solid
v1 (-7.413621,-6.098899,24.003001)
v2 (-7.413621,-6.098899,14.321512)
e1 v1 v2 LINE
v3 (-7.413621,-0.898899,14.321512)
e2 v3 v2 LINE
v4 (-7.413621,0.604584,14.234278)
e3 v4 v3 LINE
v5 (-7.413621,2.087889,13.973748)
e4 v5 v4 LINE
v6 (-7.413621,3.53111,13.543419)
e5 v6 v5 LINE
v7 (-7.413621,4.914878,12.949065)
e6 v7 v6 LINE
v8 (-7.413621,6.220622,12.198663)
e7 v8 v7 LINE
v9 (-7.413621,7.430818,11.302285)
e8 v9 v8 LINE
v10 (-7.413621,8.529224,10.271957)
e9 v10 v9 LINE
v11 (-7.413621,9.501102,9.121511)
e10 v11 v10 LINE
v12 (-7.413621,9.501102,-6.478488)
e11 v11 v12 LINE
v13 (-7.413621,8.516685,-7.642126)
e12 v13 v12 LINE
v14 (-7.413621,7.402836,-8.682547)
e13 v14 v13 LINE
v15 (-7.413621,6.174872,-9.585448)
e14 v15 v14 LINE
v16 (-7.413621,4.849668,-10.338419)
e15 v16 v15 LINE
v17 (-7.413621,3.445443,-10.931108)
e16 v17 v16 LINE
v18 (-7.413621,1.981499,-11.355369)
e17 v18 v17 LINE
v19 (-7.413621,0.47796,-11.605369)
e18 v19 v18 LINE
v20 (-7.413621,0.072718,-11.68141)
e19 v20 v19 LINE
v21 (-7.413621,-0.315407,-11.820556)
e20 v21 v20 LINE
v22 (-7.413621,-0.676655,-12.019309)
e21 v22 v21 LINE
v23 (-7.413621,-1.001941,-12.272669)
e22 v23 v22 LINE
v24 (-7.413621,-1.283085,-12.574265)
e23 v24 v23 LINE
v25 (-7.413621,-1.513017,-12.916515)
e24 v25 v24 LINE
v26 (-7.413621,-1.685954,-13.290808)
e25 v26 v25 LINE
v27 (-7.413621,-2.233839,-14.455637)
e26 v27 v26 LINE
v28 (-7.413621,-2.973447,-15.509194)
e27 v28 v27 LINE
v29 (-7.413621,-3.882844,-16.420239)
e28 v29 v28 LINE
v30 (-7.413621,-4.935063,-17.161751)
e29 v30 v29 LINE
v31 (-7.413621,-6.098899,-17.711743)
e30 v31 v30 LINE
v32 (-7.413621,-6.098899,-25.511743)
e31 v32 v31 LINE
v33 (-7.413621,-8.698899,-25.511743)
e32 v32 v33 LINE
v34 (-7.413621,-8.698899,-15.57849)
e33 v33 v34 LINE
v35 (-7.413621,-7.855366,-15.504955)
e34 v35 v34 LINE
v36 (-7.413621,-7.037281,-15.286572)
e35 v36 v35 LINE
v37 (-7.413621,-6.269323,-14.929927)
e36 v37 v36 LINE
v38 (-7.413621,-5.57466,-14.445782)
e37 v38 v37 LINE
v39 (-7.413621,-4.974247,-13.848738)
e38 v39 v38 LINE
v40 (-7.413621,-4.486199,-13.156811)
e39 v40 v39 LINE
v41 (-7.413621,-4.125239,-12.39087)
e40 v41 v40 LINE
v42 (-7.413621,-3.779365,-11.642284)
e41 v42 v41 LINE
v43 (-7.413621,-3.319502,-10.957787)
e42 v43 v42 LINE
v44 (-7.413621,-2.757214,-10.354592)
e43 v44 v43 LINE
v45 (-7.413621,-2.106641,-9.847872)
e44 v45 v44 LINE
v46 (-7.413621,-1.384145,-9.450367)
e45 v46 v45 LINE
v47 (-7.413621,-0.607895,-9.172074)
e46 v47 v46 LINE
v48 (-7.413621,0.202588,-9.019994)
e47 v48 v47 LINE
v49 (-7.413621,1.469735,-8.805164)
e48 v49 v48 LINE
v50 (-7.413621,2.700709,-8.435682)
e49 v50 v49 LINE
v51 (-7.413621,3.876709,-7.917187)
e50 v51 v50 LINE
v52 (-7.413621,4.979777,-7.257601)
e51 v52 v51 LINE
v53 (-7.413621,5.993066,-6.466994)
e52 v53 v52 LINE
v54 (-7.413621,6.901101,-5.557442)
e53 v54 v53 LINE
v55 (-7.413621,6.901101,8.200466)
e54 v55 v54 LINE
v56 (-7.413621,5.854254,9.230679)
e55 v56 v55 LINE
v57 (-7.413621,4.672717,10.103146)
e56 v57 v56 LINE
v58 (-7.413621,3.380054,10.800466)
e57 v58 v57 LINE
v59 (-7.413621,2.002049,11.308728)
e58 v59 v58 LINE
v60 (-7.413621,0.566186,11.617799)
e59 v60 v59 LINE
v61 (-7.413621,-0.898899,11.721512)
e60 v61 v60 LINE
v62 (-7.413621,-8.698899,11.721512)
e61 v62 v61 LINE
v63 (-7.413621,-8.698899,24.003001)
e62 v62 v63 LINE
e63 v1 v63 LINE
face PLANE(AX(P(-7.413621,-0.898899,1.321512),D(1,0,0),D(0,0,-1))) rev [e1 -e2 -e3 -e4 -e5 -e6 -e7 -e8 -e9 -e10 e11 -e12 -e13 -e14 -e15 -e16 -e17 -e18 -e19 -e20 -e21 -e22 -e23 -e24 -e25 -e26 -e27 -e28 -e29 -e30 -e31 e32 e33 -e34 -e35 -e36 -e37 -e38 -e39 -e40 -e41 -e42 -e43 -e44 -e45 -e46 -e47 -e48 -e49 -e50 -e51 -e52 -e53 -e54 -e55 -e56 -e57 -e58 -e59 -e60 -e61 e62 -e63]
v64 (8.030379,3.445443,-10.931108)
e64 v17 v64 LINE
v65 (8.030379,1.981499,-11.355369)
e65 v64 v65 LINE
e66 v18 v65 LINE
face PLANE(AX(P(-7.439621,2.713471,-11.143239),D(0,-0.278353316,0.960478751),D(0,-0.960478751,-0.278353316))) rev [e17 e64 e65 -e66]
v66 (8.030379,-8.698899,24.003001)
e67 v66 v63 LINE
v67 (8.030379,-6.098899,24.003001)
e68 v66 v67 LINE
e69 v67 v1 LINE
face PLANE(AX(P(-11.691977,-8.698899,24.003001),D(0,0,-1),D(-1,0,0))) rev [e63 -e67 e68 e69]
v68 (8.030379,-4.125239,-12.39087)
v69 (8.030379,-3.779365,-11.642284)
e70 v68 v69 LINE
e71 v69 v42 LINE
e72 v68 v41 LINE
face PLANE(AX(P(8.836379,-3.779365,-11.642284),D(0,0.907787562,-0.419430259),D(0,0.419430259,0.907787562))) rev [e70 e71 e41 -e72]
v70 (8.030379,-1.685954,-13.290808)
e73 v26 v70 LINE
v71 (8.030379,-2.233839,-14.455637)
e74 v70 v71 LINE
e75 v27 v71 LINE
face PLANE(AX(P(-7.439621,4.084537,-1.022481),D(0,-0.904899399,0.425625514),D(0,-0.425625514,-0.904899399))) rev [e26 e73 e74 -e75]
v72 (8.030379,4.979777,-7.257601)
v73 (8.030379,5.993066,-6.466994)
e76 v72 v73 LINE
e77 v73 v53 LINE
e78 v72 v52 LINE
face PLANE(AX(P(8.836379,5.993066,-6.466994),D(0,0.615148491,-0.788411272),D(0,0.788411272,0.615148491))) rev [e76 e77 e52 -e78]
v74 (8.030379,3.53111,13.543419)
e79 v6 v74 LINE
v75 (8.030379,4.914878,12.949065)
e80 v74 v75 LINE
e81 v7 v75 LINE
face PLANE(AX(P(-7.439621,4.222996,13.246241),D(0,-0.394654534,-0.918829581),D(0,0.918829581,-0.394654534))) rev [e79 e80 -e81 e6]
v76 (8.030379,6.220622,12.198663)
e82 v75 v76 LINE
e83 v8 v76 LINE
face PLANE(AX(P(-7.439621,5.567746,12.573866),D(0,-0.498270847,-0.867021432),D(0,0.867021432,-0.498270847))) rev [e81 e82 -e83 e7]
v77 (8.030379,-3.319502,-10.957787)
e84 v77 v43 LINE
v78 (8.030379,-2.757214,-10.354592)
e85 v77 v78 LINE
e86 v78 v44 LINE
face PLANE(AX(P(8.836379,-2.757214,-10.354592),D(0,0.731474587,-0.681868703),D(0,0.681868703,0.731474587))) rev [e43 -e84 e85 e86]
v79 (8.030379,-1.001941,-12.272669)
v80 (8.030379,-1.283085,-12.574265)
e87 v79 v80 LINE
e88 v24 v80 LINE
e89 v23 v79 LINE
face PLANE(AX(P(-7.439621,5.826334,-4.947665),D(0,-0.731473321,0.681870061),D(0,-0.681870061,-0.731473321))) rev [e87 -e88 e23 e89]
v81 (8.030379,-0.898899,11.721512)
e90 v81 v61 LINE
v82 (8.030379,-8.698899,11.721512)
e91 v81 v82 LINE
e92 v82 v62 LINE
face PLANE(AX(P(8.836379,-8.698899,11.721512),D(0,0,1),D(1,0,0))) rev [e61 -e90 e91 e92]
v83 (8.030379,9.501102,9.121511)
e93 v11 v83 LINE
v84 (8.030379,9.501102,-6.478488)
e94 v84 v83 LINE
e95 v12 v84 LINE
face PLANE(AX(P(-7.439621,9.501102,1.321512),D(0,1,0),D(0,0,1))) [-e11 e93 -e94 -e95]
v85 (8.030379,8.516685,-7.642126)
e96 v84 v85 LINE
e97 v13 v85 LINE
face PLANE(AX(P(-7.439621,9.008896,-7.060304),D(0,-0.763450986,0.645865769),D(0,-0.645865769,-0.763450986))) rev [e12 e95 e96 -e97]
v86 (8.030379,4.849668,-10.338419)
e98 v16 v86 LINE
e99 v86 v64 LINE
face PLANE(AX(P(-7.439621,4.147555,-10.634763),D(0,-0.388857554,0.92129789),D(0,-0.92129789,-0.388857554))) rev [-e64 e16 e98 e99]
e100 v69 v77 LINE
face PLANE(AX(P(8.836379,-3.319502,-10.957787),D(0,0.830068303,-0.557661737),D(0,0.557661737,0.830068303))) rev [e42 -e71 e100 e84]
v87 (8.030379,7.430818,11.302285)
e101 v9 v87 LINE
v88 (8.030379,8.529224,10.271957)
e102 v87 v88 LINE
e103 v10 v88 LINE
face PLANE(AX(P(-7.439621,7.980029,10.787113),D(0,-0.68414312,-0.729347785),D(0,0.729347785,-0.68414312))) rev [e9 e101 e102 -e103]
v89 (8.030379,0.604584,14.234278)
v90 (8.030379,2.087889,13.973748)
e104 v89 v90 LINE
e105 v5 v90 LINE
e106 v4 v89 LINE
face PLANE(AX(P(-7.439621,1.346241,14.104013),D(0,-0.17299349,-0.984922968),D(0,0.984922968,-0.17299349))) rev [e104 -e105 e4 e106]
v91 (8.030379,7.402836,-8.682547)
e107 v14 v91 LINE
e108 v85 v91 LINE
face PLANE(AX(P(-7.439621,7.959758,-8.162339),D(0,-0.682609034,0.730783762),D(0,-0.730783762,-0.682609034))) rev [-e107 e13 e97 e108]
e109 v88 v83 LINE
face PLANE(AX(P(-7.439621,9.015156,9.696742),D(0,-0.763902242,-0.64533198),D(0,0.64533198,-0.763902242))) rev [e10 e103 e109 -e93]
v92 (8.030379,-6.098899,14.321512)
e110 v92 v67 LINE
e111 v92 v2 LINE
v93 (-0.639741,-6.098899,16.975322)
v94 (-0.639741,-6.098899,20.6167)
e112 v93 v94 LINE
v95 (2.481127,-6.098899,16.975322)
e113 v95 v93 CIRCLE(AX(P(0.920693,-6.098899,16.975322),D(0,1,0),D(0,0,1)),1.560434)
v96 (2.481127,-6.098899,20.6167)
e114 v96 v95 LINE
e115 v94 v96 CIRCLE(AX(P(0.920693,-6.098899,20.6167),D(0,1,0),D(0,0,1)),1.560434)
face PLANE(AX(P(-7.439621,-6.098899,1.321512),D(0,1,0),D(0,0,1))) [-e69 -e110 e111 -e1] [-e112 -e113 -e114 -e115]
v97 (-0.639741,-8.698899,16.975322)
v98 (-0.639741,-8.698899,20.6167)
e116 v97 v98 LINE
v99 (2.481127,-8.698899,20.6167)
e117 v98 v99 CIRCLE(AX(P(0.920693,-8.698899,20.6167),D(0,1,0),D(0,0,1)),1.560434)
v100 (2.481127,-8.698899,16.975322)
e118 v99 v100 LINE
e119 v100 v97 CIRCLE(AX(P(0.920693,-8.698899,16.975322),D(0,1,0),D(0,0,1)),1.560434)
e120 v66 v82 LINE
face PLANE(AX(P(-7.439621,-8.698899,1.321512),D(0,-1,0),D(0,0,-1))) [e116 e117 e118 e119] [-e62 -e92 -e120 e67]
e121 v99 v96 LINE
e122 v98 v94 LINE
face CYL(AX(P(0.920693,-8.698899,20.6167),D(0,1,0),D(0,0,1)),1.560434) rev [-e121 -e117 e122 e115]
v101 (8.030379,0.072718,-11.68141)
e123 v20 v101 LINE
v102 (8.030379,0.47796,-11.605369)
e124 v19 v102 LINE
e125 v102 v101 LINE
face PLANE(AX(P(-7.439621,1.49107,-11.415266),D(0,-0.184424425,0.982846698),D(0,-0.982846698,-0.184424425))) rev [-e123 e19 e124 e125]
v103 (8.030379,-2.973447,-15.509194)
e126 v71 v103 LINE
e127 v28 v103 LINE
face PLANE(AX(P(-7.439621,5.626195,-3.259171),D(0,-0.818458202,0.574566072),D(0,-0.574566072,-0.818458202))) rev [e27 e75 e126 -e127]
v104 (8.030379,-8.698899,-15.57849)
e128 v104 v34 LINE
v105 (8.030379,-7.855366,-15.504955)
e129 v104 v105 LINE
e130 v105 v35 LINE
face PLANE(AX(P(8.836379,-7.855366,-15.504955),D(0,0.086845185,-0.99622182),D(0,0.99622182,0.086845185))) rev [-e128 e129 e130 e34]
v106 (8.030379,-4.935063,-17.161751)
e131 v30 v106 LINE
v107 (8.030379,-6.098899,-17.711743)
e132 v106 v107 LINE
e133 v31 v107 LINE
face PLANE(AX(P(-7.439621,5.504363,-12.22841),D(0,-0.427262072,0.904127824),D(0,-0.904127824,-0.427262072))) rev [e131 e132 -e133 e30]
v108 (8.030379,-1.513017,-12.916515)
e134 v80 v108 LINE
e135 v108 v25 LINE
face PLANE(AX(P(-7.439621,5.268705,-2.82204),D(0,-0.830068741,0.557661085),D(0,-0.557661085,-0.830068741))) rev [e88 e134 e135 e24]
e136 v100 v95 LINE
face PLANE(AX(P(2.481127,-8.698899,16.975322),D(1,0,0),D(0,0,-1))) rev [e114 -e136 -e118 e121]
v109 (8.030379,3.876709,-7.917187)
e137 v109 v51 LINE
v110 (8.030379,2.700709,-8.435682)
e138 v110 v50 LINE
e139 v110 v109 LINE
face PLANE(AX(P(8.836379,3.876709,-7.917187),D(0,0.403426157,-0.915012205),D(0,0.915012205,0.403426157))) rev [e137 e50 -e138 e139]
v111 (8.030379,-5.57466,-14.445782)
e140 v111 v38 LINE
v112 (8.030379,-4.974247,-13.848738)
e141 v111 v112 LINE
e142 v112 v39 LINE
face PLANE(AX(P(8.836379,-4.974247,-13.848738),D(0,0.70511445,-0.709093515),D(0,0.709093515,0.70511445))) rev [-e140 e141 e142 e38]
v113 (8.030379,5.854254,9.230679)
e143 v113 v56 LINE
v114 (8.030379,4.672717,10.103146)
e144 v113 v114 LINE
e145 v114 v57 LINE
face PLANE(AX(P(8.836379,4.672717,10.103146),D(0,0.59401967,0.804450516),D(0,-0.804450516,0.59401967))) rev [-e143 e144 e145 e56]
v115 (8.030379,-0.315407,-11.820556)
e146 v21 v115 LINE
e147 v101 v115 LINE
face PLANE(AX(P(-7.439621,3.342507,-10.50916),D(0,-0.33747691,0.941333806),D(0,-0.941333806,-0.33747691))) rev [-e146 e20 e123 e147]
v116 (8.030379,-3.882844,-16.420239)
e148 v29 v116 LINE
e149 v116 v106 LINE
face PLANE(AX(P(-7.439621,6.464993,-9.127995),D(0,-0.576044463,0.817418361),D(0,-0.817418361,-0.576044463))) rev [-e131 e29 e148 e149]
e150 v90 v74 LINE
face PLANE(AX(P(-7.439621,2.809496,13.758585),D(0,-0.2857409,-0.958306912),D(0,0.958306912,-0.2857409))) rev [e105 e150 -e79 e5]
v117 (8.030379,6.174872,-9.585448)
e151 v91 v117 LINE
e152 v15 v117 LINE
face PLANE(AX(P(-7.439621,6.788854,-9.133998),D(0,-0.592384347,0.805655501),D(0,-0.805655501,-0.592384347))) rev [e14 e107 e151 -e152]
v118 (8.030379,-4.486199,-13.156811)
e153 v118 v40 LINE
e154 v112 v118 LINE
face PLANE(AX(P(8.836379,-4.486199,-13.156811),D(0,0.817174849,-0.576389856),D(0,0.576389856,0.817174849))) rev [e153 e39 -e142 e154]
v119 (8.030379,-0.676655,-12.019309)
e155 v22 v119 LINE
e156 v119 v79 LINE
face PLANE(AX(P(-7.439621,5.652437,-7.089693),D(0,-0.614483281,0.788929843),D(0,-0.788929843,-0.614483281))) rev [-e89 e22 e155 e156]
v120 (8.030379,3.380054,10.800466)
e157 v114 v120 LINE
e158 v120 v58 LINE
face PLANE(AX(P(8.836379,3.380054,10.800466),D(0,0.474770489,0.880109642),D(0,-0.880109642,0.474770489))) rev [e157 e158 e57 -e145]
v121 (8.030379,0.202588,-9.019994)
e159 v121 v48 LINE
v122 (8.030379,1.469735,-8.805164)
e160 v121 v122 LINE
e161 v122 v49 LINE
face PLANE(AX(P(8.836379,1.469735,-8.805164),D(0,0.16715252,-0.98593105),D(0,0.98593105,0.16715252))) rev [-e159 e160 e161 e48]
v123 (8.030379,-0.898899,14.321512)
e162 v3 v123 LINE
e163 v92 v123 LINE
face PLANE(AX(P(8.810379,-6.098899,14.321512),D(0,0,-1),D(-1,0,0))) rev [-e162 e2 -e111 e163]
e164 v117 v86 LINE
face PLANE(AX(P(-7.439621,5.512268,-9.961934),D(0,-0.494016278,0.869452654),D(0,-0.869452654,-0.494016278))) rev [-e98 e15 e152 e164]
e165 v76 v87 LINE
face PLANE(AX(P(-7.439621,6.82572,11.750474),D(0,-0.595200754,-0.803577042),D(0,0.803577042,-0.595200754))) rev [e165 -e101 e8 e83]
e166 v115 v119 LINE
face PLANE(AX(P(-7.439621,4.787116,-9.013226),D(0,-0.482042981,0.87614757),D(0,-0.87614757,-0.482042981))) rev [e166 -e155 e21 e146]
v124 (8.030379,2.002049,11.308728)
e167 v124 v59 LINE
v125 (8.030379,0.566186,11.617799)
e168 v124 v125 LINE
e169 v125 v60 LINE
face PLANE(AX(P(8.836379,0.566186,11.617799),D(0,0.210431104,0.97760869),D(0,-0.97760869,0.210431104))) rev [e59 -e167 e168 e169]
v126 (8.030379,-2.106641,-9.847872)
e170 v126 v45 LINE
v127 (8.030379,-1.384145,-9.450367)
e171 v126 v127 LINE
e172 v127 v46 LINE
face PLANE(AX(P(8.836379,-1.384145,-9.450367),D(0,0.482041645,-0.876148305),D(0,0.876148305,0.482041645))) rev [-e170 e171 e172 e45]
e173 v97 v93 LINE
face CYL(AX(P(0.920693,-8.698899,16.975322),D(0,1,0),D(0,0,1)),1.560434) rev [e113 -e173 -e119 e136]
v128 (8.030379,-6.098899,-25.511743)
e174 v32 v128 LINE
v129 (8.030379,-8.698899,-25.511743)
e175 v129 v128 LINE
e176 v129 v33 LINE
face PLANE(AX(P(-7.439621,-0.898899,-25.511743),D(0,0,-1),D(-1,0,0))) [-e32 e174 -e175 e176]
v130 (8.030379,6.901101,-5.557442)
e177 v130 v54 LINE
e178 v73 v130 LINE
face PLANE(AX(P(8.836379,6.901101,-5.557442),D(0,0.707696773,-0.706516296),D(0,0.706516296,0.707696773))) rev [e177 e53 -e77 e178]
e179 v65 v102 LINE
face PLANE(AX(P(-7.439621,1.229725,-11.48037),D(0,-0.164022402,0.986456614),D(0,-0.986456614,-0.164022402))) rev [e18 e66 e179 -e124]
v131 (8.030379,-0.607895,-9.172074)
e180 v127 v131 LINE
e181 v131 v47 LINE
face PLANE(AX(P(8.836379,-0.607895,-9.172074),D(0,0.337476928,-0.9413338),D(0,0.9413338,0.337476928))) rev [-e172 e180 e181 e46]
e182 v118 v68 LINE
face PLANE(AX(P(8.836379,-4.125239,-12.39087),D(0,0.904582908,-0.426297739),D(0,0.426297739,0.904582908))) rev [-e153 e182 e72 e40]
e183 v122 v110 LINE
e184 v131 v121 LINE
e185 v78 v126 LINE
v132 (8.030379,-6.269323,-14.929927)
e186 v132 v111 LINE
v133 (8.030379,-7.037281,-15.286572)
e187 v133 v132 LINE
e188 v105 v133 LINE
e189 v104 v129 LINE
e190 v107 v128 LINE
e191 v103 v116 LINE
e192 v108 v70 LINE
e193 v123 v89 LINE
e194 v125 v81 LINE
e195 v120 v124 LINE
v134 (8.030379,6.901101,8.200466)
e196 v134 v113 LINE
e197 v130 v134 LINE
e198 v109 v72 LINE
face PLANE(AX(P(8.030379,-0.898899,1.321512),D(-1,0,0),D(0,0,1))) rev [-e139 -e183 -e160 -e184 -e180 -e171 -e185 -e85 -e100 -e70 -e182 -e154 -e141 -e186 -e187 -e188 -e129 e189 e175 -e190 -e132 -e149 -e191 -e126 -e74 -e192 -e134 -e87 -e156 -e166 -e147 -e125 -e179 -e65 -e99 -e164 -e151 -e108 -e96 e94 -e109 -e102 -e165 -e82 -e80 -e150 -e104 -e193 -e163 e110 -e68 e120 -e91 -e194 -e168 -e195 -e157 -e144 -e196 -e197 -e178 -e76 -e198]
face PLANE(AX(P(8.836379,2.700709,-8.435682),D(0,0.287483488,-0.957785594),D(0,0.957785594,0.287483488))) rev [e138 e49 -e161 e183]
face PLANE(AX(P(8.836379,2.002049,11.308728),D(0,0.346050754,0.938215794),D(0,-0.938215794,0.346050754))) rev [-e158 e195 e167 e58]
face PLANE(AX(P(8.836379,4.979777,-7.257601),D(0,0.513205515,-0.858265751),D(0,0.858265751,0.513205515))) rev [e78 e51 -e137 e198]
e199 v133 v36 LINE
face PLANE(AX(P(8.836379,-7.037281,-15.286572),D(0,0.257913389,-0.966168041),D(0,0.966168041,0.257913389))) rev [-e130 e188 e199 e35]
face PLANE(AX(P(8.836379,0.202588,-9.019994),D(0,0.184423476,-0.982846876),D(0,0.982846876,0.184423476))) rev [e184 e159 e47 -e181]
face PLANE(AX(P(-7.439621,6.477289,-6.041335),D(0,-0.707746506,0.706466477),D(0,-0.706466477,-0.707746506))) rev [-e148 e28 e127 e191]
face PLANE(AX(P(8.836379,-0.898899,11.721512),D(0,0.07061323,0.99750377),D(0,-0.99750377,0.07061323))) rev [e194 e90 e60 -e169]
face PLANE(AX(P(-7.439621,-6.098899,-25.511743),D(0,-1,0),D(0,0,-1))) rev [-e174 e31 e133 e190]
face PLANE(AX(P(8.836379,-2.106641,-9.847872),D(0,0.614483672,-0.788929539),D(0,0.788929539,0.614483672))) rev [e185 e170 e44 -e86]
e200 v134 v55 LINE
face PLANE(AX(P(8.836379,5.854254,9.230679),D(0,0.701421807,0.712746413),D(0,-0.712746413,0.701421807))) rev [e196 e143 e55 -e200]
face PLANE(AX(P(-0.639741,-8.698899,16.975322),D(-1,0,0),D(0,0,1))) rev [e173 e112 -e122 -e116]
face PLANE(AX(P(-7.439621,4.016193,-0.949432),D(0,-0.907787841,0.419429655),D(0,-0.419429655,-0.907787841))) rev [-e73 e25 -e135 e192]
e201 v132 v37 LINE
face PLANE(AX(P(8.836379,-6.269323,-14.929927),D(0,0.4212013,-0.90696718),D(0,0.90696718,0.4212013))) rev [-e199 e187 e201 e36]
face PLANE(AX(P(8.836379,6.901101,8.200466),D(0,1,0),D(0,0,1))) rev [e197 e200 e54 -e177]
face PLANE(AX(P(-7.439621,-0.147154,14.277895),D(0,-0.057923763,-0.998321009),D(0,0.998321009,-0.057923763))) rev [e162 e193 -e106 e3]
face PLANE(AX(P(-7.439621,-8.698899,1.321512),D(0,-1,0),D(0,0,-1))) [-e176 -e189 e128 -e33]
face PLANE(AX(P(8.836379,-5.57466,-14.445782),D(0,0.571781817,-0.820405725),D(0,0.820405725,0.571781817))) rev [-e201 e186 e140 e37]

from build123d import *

# Parameters (mm, degrees)
CUT_EXTRUDE1_START   = -0.299999985
CUT_EXTRUDE1_DEPTH   = 0.099999976
CUT_EXTRUDE1_2_DEPTH = 0.624999986
CUT_EXTRUDE2_REACH   = 3.369
CUT_EXTRUDE3_DEPTH   = 0.099999976
CUT_EXTRUDE4_DEPTH   = 2.439835087
SKETCH8_W            = 0.45707022
SKETCH8_H            = 0.126497466
CUT_EXTRUDE5_DEPTH   = 2.36862159
BOSS_EXTRUDE1_DEPTH  = 0.3
SKETCH10_W           = 0.320867719
SKETCH10_H           = 0.471779159
BOSS_EXTRUDE2_DEPTH  = 0.1
CUT_EXTRUDE6_DEPTH   = 2.347497156
SKETCH12_W           = 0.905202631
SKETCH12_H           = 0.17588134
CUT_EXTRUDE7_DEPTH   = 2.347497156
SKETCH13_W           = 2.413938714
SKETCH13_H           = 1.247285026
CUT_EXTRUDE8_DEPTH   = 0.03
SKETCH14_W           = 2.254507246
SKETCH14_H           = 1.130570224
CUT_EXTRUDE9_DEPTH   = 0.001
SCALE1_SCALE         = 26


with BuildPart() as part:
    # Cut-Extrude1: read off the stored shape, not the designer's step
    # Cut-Extrude1 outline → Cut-Extrude1 (new body)
    with BuildSketch(Plane(origin=(0, 0, 0), x_dir=(-1, 0, 0), z_dir=(0, 1, 0)).offset(CUT_EXTRUDE1_START)):
        Polygon((-0.103293976, 1.023100922), (-0.125000006, 1.025000005), (-0.500000024, 1.025000005), (-0.52170601, 1.023100922), (-0.542752503, 1.017461531), (-0.562499976, 1.008253195), (-0.580348424, 0.995755661), (-0.595755526, 0.980348443), (-0.608253176, 0.962500053), (-0.61746157, 0.942752522), (-0.623101019, 0.921706087), (-0.624999986, 0.899999985), (-0.624999986, -1.025000005), (-0.623101019, -1.046706107), (-0.61746157, -1.067752484), (-0.608253176, -1.087500015), (-0.595755526, -1.105348463), (-0.580348424, -1.120755565), (-0.562499976, -1.133253216), (-0.542752503, -1.142461551), (-0.52170601, -1.148100942), (-0.500000024, -1.150000026), (-0.125000006, -1.150000026), (-0.103293976, -1.148100942), (-0.082247483, -1.142461551), (-0.062500003, -1.133253216), (-0.044651548, -1.120755565), (-0.029244446, -1.105348463), (-0.016746824, -1.087500015), (-0.007538422, -1.067752484), (-0.001899031, -1.046706107), (0, -1.025000005), (0, 0.899999985), (-0.001899031, 0.921706087), (-0.007538422, 0.942752522), (-0.016746824, 0.962500053), (-0.029244446, 0.980348443), (-0.044651548, 0.995755661), (-0.062500003, 1.008253195), (-0.082247483, 1.017461531), align=None)
    extrude(amount=CUT_EXTRUDE1_DEPTH)

    # Cut-Extrude1 2 outline → Cut-Extrude1 2 (add)
    with BuildSketch(Plane.YZ):
        Polygon((0.057826259, 0.496644876), (0, 0.500000024), (-0.200000009, 0.500000024), (-0.200000009, -0.73204824), (-0.155237081, -0.710894703), (-0.114767128, -0.682375045), (-0.079790305, -0.647334848), (-0.051343839, -0.60681341), (-0.030271342, -0.562012312), (-0.023619925, -0.547616393), (-0.014776401, -0.534452964), (-0.003963165, -0.522853108), (0.008547848, -0.513108505), (0.022442007, -0.505464152), (0.037369897, -0.500112365), (0.0529561, -0.497187721), (0.110784524, -0.487572339), (0.167090067, -0.471254607), (0.22109873, -0.448458857), (0.272068108, -0.41949845), (0.319297513, -0.384771498), (0.362137827, -0.344755303), (0.400000019, -0.299999985), (0.400000019, 0.299999985), (0.362620107, 0.344247906), (0.320373714, 0.383875886), (0.273827725, 0.418351992), (0.223606796, 0.447213592), (0.170384956, 0.47007337), (0.114876457, 0.486624485), align=None)
    extrude(amount=CUT_EXTRUDE1_2_DEPTH)

    # Sketch2 → Cut-Extrude2 (cut, up to next)
    with BuildSketch(Plane.ZY, mode=Mode.PRIVATE) as cut_extrude2_sk1:
        Polygon((-0.65000006, -0.299999985), (0.400000019, -0.299999985), (0.400000019, 0), (0.396011048, 0.056349407), (0.384123705, 0.11157494), (0.364575157, 0.164575133), (0.337755162, 0.214292915), (0.304198737, 0.259736669), (0.264575152, 0.299999985), (-0.264575152, 0.299999985), (-0.299557927, 0.265075563), (-0.329965871, 0.226102915), (-0.355334574, 0.183677243), (-0.375276693, 0.138446456), (-0.389487541, 0.091101319), (-0.397750206, 0.042364885), (-0.403599464, 0.011192467), (-0.414303038, -0.01866331), (-0.429591688, -0.046451623), (-0.449080922, -0.07147366), (-0.472280721, -0.093100134), (-0.498607522, -0.110787172), (-0.527399301, -0.124090002), (-0.556858547, -0.137973097), (-0.583471148, -0.15674415), (-0.606434362, -0.179836949), (-0.625055342, -0.20655476), (-0.638772442, -0.236091611), (-0.647171808, -0.267556432), align=None)
    cut_extrude2_tool1 = extrude(cut_extrude2_sk1.sketch, amount=-CUT_EXTRUDE2_REACH, mode=Mode.PRIVATE) & part.part
    add(cut_extrude2_tool1.solids().sort_by_distance((0, -0.029264, -0.044377))[0], mode=Mode.SUBTRACT)

    # Sketch3 → Cut-Extrude3 (cut)
    with BuildSketch(Plane(origin=(0, -0.200000009, 0), x_dir=(-1, 0, 0), z_dir=(0, 1, 0))):
        Polygon((-0.231526632, 0.946749991), (-0.240874855, 0.960100675), (-0.252399361, 0.971625152), (-0.265749986, 0.98097336), (-0.280521112, 0.987861305), (-0.296263897, 0.992079498), (-0.312499993, 0.993499998), (-0.328736118, 0.992079498), (-0.344478874, 0.987861305), (-0.359249971, 0.98097336), (-0.372600654, 0.971625152), (-0.38412516, 0.960100675), (-0.393473398, 0.946749991), (-0.400361256, 0.931978866), (-0.404579536, 0.91623608), (-0.405999977, 0.899999985), (-0.405999977, 0.713000074), (-0.404579536, 0.69676392), (-0.400361256, 0.681021134), (-0.393473398, 0.666250009), (-0.38412516, 0.652899384), (-0.372600654, 0.641374907), (-0.359249971, 0.63202664), (-0.344478874, 0.625138753), (-0.328736118, 0.620920502), (-0.312499993, 0.619500061), (-0.296263897, 0.620920502), (-0.280521112, 0.625138753), (-0.265749986, 0.63202664), (-0.252399361, 0.641374907), (-0.240874855, 0.652899384), (-0.231526632, 0.666250009), (-0.224638745, 0.681021134), (-0.220420479, 0.69676392), (-0.219000009, 0.713000074), (-0.219000009, 0.899999985), (-0.220420479, 0.91623608), (-0.224638745, 0.931978866), align=None)
    extrude(amount=-CUT_EXTRUDE3_DEPTH, mode=Mode.SUBTRACT)

    # Sketch4 → Cut-Extrude4 (cut, through all)
    with BuildSketch(Plane(origin=(0, -0.200000009, 0), x_dir=(-1, 0, 0), z_dir=(0, 1, 0))):
        Polygon((-0.393473398, -1.07175007), (-0.38412516, -1.085100695), (-0.372600654, -1.09662523), (-0.359249971, -1.105973381), (-0.344478874, -1.112861326), (-0.328736118, -1.117079635), (-0.312499993, -1.118500018), (-0.296263897, -1.117079635), (-0.280521112, -1.112861326), (-0.265749986, -1.105973381), (-0.252399361, -1.09662523), (-0.240874855, -1.085100695), (-0.231526632, -1.07175007), (-0.224638745, -1.056978945), (-0.220420479, -1.041236101), (-0.219000009, -1.025000005), (-0.219000009, -0.837999978), (-0.220420479, -0.821763941), (-0.224638745, -0.806021097), (-0.231526632, -0.791249971), (-0.240874855, -0.777899404), (-0.252399361, -0.766374869), (-0.265749986, -0.757026661), (-0.280521112, -0.750138774), (-0.296263897, -0.745920464), (-0.312499993, -0.744499965), (-0.328736118, -0.745920464), (-0.344478874, -0.750138774), (-0.359249971, -0.757026661), (-0.372600654, -0.766374869), (-0.38412516, -0.777899404), (-0.393473398, -0.791249971), (-0.400361256, -0.806021097), (-0.404579536, -0.821763941), (-0.405999977, -0.837999978), (-0.405999977, -1.025000005), (-0.404579536, -1.041236101), (-0.400361256, -1.056978945), align=None)
    extrude(amount=-CUT_EXTRUDE4_DEPTH, mode=Mode.SUBTRACT)

    # Sketch8 → Cut-Extrude5 (cut, through all)
    with BuildSketch(Plane(origin=(0, 0, 0), x_dir=(0, 0, -1), z_dir=(1, 0, 0))):
        with Locations((0.96058335, -0.263248742)):
            Rectangle(SKETCH8_W, SKETCH8_H)
    extrude(amount=CUT_EXTRUDE5_DEPTH, mode=Mode.SUBTRACT)

    # Sketch9 → Boss-Extrude1 (add)
    with BuildSketch(Plane(origin=(0, 0, -0.73204824), x_dir=(-1, 0, 0), z_dir=(0, 0, -1))):
        Polygon((0, -0.299999985), (0, -0.200000009), (-0.624999986, -0.200000009), (-0.624999986, -0.278120473), (-0.624999986, -0.299999985), (-0.529422539, -0.299999985), (-0.519709533, -0.299999985), (-0.506867205, -0.299999985), (-0.490512573, -0.299999985), (-0.470477371, -0.299999985), (-0.447049913, -0.299999985), (-0.421272081, -0.299999985), (-0.395156344, -0.299999985), (-0.371582464, -0.299999985), (-0.353676372, -0.299999985), (-0.271323614, -0.299999985), (-0.253417547, -0.299999985), (-0.229843642, -0.299999985), (-0.203727882, -0.299999985), (-0.177950094, -0.299999985), (-0.154522634, -0.299999985), (-0.134487439, -0.299999985), (-0.118132789, -0.299999985), (-0.105290467, -0.299999985), (-0.095577447, -0.299999985), (-0.047916146, -0.299999985), align=None)
    extrude(amount=BOSS_EXTRUDE1_DEPTH)

    # Sketch10 → Boss-Extrude2 (add, through all)
    with BuildSketch(Plane(origin=(0, -0.200000009, 0), x_dir=(-1, 0, 0), z_dir=(0, 1, 0))):
        with Locations((-0.31112302, 0.768217279)):
            Rectangle(SKETCH10_W, SKETCH10_H)
    extrude(amount=-BOSS_EXTRUDE2_DEPTH)

    # Sketch11 → Cut-Extrude6 (cut, through all)
    with BuildSketch(Plane(origin=(0, -0.200000009, 0), x_dir=(-1, 0, 0), z_dir=(0, 1, 0))):
        with BuildLine():
            Line((-0.381567202, 0.602069646), (-0.381567202, 0.742122646))
            ThreePointArc((-0.381567202, 0.742122646), (-0.321550512, 0.802139336), (-0.261533822, 0.742122646))
            Line((-0.261533822, 0.742122646), (-0.261533822, 0.602069646))
            ThreePointArc((-0.261533822, 0.602069646), (-0.321550512, 0.542052956), (-0.381567202, 0.602069646))
        make_face()
    extrude(amount=-CUT_EXTRUDE6_DEPTH, mode=Mode.SUBTRACT)

    # Sketch12 → Cut-Extrude7 (cut, through all)
    with BuildSketch(Plane(origin=(0, -0.200000009, 0), x_dir=(-1, 0, 0), z_dir=(0, 1, 0))):
        with Locations((-0.289049147, 0.960305627)):
            Rectangle(SKETCH12_W, SKETCH12_H)
    extrude(amount=-CUT_EXTRUDE7_DEPTH, mode=Mode.SUBTRACT)

    # Sketch13 → Cut-Extrude8 (cut)
    with BuildSketch(Plane(origin=(0.624999986, 0, 0), x_dir=(0, 0, -1), z_dir=(1, 0, 0))):
        Rectangle(SKETCH13_W, SKETCH13_H)
    extrude(amount=-CUT_EXTRUDE8_DEPTH, mode=Mode.SUBTRACT)

    # Sketch14 → Cut-Extrude9 (cut)
    with BuildSketch(Plane.ZY):
        Rectangle(SKETCH14_W, SKETCH14_H)
    extrude(amount=-CUT_EXTRUDE9_DEPTH, mode=Mode.SUBTRACT)


with BuildPart() as part_1:
    # Scale1: scaled about (0.297584829, 0.035955959, -0.052860466)
    add(part.part.scale(SCALE1_SCALE).moved(Location((-7.439620725, -0.898898975, 1.32151165))))


solid = part_1.part
